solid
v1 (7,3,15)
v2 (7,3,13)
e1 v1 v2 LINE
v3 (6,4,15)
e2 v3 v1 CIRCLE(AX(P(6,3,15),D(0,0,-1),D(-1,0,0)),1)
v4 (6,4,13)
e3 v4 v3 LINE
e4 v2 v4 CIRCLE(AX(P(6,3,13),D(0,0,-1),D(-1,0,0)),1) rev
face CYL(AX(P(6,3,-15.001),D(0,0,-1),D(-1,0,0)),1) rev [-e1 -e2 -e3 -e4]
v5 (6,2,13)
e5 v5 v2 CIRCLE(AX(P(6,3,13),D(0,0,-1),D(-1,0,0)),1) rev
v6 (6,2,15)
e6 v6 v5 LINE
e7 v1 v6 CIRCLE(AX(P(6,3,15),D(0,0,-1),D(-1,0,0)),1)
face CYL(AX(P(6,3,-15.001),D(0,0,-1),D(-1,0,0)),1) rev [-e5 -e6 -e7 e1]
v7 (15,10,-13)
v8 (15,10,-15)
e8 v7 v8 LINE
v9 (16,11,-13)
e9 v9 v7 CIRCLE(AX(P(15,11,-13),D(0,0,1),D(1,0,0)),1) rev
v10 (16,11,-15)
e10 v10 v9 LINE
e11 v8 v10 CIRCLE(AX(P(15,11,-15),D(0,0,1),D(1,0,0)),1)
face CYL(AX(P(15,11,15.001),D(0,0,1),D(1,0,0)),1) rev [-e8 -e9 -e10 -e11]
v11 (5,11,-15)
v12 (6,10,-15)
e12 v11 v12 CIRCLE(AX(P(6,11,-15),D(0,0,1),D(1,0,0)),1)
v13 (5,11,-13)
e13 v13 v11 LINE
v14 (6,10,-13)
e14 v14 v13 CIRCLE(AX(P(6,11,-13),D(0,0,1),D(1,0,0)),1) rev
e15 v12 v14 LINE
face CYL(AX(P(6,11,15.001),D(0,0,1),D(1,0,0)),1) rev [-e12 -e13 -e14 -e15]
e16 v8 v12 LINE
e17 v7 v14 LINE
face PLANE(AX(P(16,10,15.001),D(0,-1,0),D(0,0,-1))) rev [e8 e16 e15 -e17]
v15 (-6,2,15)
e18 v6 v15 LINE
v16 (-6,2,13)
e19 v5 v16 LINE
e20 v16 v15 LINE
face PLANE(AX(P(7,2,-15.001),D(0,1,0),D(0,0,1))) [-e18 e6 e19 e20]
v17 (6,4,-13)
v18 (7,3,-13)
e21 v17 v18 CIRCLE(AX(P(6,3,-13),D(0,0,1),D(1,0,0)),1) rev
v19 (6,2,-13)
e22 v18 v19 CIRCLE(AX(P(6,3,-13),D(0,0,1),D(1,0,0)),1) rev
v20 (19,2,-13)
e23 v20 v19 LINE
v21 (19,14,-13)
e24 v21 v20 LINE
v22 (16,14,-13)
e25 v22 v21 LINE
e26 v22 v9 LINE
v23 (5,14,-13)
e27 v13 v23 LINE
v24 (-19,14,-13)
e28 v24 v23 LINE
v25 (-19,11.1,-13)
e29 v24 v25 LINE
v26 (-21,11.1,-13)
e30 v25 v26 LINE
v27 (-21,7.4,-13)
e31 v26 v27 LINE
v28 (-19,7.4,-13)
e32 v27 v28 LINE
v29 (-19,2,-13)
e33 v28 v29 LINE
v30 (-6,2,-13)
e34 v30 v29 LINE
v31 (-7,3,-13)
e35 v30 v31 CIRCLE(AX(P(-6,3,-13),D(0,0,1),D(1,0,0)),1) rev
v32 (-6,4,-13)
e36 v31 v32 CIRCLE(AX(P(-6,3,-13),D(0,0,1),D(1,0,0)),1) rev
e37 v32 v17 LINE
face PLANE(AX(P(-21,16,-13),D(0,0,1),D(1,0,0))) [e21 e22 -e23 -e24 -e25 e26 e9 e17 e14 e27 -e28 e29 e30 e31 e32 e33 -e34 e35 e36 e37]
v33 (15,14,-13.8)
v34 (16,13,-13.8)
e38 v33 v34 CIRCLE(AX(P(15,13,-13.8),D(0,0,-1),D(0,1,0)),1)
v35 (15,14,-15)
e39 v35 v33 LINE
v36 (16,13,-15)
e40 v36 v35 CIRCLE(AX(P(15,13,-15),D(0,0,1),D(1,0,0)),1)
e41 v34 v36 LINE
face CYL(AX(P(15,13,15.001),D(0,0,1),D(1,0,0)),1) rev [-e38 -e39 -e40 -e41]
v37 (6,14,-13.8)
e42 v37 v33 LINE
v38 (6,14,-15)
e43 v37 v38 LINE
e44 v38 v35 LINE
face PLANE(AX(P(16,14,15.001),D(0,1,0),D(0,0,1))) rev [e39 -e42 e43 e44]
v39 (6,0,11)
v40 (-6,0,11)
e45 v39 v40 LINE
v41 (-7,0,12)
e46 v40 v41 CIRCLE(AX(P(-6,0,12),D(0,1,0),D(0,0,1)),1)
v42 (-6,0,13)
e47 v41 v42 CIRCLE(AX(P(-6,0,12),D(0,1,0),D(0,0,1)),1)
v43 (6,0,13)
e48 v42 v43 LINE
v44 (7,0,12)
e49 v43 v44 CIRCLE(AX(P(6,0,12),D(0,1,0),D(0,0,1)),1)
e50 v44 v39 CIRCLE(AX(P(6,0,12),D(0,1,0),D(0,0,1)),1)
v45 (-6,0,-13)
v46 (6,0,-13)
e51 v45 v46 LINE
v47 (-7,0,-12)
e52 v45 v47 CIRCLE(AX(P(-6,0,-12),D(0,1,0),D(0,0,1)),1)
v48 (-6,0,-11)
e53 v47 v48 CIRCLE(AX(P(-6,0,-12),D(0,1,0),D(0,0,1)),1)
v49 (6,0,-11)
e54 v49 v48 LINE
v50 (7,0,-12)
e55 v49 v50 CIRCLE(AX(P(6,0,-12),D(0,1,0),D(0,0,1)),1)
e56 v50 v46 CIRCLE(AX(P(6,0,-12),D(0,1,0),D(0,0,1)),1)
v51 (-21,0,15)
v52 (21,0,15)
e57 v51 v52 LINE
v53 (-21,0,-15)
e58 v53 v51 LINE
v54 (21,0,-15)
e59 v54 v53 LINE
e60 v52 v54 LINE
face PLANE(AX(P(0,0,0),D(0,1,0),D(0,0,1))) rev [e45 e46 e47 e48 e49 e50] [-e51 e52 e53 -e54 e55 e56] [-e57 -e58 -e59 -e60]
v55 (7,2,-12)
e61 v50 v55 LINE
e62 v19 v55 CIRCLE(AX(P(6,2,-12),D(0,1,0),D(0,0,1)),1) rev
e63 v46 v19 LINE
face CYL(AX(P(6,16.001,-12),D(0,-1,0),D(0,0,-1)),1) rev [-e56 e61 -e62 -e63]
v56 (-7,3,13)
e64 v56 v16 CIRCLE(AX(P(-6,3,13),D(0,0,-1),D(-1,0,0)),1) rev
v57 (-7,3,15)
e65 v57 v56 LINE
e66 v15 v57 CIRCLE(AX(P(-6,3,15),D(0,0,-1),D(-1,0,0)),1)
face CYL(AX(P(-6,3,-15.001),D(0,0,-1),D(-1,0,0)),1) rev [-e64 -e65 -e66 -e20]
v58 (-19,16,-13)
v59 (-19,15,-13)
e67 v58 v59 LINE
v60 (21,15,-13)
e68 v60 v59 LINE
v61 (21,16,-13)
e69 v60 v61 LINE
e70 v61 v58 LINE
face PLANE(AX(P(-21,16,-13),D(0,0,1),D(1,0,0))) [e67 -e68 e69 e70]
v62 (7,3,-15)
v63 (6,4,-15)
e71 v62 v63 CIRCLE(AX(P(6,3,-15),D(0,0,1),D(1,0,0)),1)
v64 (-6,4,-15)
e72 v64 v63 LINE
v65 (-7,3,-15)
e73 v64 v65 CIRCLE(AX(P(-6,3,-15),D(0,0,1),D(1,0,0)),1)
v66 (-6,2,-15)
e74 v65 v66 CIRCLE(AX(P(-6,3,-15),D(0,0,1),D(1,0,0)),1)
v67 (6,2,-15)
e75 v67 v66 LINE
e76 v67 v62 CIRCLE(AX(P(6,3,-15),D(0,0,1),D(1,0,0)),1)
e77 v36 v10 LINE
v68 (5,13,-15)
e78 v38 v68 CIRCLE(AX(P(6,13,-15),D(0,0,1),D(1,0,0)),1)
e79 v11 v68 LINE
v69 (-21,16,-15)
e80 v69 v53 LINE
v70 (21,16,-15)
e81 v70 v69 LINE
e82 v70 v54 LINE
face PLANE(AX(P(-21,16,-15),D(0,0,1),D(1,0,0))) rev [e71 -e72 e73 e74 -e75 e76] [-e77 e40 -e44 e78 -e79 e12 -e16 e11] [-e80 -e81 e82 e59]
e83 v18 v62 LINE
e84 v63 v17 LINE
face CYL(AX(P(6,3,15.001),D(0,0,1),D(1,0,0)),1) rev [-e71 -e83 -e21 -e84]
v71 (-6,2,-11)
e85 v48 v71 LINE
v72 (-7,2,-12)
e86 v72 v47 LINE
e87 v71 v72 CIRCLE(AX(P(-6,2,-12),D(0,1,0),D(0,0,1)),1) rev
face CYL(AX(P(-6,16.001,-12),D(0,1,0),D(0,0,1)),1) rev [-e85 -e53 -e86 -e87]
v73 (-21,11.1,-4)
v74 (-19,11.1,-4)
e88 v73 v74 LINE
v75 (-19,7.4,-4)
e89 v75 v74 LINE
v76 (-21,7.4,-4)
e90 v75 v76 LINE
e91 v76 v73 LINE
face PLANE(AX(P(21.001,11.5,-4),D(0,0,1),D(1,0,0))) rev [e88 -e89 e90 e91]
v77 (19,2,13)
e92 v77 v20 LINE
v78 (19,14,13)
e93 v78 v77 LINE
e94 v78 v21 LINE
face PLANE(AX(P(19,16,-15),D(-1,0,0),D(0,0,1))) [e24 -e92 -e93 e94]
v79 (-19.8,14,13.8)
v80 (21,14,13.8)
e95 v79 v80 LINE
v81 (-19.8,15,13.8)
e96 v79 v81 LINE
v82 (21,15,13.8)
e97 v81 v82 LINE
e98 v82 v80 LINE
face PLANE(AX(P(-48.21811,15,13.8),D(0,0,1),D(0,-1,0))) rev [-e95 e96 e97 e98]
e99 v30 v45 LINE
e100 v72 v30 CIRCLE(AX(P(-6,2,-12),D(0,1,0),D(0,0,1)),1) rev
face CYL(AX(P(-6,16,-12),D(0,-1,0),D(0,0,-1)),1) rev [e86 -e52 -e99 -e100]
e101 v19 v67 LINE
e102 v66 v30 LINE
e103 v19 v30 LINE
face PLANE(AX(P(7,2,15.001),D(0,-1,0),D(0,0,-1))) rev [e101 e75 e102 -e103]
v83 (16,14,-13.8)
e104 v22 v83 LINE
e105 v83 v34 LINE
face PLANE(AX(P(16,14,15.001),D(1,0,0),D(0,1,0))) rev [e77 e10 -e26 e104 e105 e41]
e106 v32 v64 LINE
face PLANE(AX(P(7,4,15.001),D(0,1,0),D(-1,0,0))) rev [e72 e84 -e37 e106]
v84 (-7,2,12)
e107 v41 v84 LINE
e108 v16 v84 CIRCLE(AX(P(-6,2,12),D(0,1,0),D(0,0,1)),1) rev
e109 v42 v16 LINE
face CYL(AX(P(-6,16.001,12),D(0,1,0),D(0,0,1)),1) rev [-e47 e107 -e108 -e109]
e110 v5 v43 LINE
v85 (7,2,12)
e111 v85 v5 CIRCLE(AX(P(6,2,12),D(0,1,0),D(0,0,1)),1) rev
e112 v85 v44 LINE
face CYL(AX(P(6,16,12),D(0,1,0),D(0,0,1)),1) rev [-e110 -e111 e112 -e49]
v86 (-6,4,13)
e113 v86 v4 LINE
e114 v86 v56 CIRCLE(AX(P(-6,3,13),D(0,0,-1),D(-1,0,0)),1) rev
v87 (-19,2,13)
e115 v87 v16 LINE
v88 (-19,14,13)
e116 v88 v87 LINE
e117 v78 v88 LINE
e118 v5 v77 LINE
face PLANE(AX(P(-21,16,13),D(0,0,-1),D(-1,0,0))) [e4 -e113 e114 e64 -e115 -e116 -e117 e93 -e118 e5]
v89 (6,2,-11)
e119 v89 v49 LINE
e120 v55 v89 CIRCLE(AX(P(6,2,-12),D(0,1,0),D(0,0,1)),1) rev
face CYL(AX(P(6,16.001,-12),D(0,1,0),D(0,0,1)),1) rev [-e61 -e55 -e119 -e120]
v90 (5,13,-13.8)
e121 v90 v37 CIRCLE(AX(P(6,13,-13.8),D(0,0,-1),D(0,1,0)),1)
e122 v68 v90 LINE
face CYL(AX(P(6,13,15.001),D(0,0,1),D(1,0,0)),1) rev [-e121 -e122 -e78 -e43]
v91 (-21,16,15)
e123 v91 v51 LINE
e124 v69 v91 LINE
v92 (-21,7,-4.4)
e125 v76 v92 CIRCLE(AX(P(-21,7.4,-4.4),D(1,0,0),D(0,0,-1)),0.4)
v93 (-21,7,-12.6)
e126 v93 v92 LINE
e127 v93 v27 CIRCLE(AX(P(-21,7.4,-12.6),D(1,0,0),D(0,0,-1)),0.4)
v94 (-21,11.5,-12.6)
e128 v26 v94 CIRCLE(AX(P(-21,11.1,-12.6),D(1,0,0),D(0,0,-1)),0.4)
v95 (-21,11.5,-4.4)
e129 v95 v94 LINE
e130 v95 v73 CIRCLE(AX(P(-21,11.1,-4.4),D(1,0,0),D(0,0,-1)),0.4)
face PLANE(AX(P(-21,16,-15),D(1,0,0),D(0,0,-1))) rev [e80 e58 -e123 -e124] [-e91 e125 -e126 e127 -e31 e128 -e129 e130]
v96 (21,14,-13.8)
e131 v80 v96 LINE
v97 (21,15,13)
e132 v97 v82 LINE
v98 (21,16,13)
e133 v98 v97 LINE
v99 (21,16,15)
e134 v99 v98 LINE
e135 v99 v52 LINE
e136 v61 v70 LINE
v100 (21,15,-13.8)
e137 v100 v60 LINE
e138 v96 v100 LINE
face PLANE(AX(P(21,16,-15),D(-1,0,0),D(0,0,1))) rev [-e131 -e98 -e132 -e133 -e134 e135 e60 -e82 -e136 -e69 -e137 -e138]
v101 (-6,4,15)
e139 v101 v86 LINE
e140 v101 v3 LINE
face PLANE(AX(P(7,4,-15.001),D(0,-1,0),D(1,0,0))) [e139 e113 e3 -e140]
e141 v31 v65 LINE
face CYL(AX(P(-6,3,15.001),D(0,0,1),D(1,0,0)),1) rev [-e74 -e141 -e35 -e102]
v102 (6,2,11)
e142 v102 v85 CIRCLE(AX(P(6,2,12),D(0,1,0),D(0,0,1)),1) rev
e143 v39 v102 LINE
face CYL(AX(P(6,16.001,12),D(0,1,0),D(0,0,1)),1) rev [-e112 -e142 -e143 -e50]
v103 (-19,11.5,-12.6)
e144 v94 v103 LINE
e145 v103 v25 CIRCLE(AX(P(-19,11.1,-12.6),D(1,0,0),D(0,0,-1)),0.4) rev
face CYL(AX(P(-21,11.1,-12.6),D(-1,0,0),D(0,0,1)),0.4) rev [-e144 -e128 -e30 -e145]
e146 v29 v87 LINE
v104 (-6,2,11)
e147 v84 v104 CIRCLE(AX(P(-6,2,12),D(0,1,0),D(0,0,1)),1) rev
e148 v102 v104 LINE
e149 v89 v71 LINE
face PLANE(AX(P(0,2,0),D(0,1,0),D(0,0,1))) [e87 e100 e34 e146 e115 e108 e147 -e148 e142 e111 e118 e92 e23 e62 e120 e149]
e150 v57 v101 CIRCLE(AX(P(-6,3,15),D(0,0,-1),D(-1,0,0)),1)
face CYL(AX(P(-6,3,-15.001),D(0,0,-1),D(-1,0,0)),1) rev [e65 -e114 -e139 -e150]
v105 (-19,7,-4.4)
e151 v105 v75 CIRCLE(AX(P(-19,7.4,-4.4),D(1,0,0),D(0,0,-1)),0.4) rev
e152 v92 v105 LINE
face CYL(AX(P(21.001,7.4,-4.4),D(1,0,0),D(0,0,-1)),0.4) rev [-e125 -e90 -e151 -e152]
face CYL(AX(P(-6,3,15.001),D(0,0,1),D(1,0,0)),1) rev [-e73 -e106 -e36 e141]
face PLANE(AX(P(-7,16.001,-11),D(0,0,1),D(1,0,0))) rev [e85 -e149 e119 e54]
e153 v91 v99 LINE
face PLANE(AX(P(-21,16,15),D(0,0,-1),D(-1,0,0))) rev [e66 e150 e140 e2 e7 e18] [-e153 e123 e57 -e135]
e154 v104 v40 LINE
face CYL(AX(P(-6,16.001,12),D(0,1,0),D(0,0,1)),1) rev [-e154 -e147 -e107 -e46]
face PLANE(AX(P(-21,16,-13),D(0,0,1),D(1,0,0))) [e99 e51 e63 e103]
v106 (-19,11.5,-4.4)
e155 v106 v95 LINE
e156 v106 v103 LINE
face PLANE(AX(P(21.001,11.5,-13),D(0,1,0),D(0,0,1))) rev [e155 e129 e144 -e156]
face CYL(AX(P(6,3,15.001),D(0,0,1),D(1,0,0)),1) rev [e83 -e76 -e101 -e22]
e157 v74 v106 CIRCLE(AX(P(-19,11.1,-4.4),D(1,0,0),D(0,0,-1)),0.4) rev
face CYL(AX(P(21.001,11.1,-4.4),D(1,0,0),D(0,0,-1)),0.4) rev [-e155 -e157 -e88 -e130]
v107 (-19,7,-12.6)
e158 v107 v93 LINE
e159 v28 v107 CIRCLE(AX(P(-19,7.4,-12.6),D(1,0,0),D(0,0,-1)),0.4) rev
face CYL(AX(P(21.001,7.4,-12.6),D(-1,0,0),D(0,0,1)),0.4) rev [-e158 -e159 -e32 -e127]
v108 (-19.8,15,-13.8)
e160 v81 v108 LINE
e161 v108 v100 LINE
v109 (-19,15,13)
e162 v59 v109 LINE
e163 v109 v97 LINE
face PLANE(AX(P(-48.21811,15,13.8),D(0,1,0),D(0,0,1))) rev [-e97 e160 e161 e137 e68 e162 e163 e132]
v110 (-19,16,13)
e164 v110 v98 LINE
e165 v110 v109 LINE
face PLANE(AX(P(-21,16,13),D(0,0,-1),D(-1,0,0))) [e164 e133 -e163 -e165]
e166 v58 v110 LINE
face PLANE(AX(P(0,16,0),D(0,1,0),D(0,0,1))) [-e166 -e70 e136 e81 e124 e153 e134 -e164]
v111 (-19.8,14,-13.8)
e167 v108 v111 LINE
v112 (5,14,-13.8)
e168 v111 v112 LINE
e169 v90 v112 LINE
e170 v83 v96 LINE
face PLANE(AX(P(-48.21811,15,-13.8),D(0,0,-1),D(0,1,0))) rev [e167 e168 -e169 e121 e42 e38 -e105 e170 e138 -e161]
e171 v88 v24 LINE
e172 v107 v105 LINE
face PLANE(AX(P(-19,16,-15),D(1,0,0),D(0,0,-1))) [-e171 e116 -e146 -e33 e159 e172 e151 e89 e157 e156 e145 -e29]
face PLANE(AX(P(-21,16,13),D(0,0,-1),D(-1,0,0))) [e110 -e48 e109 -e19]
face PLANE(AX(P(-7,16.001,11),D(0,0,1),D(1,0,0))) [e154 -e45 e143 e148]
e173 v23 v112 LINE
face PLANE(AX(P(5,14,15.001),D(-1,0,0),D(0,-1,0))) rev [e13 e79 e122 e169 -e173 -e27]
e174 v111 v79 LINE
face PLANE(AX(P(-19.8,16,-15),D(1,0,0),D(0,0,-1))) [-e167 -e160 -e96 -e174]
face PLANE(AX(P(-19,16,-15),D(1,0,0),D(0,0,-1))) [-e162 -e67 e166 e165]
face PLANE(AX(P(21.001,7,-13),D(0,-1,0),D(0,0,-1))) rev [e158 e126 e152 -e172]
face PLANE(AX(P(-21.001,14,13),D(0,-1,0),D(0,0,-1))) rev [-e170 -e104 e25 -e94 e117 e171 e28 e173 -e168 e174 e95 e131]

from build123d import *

# Parameters (mm, degrees)
SKETCH_1_W             = 42
SKETCH_1_H             = 30
EXTRUDE_1_DEPTH        = 16
SHELL_1_T              = -2
CUT_EXTRUDE_3_REACH    = 49.381
SKETCH_4_W             = 26
SKETCH_4_H             = 2
SKETCH_5_W             = 27.6
SKETCH_5_H             = 1
CUT_EXTRUDE_4_DEPTH    = 40.8
CUT_EXTRUDE_6_REACH    = 32.364
SKETCH_8_W             = 14
SKETCH_8_H             = 2
CUT_EXTRUDE_7_REACH    = 41.962
SKETCH_9_W             = 14
SKETCH_9_H             = 2
FILLET_3_R             = 1
FILLET_4_R             = 1
FILLET_3_OF_MIRROR_1_R = 1
FILLET_4_OF_MIRROR_1_R = 1
CUT_EXTRUDE_8_REACH    = 49.381
SKETCH_10_W            = 9
SKETCH_10_H            = 4.5
CUT_EXTRUDE_9_REACH    = 41.962
SKETCH_11_W            = 11
SKETCH_11_H            = 4
FILLET_5_R             = 1
FILLET_6_R             = 0.4


# Some blends are built 0.0001 mm under size
with BuildPart() as part:
    # 草图1 → 凸台-拉伸1 (new body)
    with BuildSketch(Plane(origin=(0, 0, 0), x_dir=(1, 0, 0), z_dir=(0, 1, 0))):
        Rectangle(SKETCH_1_W, SKETCH_1_H)
    extrude(amount=EXTRUDE_1_DEPTH)

    # 抽壳1
    shell_1_openings = [part.faces().sort_by_distance(p)[0] for p in [
        (0, 16, 0),
    ]]
    offset(amount=SHELL_1_T, openings=shell_1_openings, kind=Kind.INTERSECTION)

    # 草图4 → 切除-拉伸3 (cut, up to next)
    with BuildSketch(Plane(origin=(21, 0, 0), x_dir=(0, 0, -1), z_dir=(1, 0, 0)), mode=Mode.PRIVATE) as cut_extrude_3_sk1:
        with Locations((0, 15)):
            Rectangle(SKETCH_4_W, SKETCH_4_H)
    cut_extrude_3_tool1 = extrude(cut_extrude_3_sk1.sketch, amount=-CUT_EXTRUDE_3_REACH, mode=Mode.PRIVATE) & part.part
    add(cut_extrude_3_tool1.solids().sort_by_distance((21, 15, 0))[0], mode=Mode.SUBTRACT)

    # 草图5 → 切除-拉伸4 (cut)
    with BuildSketch(Plane(origin=(21, 0, 0), x_dir=(0, 0, -1), z_dir=(1, 0, 0))):
        with Locations((0, 14.5)):
            Rectangle(SKETCH_5_W, SKETCH_5_H)
    extrude(amount=-CUT_EXTRUDE_4_DEPTH, mode=Mode.SUBTRACT)

    # 草图8 → 切除-拉伸6 (cut, up to next)
    with BuildSketch(Plane.XZ, mode=Mode.PRIVATE) as cut_extrude_6_sk1:
        with Locations((0, -12)):
            Rectangle(SKETCH_8_W, SKETCH_8_H)
    cut_extrude_6_tool1 = extrude(cut_extrude_6_sk1.sketch, amount=-CUT_EXTRUDE_6_REACH, mode=Mode.PRIVATE) & part.part
    cut_extrude_6 = cut_extrude_6_tool1.solids().sort_by_distance((0, 0, -12))[0]
    add(cut_extrude_6, mode=Mode.SUBTRACT)

    # 草图9 → 切除-拉伸7 (cut, up to next)
    with BuildSketch(Plane(origin=(0, 0, -15), x_dir=(-1, 0, 0), z_dir=(0, 0, -1)), mode=Mode.PRIVATE) as cut_extrude_7_sk1:
        with Locations((0, 3)):
            Rectangle(SKETCH_9_W, SKETCH_9_H)
    cut_extrude_7_tool1 = extrude(cut_extrude_7_sk1.sketch, amount=-CUT_EXTRUDE_7_REACH, mode=Mode.PRIVATE) & part.part
    cut_extrude_7 = cut_extrude_7_tool1.solids().sort_by_distance((0, 3, -15))[0]
    add(cut_extrude_7, mode=Mode.SUBTRACT)

    # 圆角3
    # the kernel refuses this fillet: 1 mm, written as the material it adds along each edge
    with BuildSketch(Plane(origin=(-7, 4, -15), x_dir=(0, -1, 0), z_dir=(0, 0, 1)), Plane(origin=(-7, 2, -15), x_dir=(1, 0, 0), z_dir=(0, 0, 1)), Plane(origin=(7, 2, -15), x_dir=(0, 1, 0), z_dir=(0, 0, 1))) as fillet_3_piece_1:
        with BuildLine():
            CenterArc((FILLET_3_R, FILLET_3_R), FILLET_3_R, 180, 90)
            Line((0, FILLET_3_R), (0, 0))
            Line((0, 0), (FILLET_3_R, 0))
        make_face()
    extrude(amount=2)
    with BuildSketch(Plane(origin=(7, 4, -15), x_dir=(0, -1, 0), z_dir=(0, 0, 1))) as fillet_3_piece_2:
        with BuildLine():
            CenterArc((FILLET_3_R, -FILLET_3_R), FILLET_3_R, 90, 90)
            Line((0, -FILLET_3_R), (0, 0))
            Line((0, 0), (FILLET_3_R, 0))
        make_face()
    extrude(amount=2)

    # 圆角4
    fillet_4_edges = [part.edges().sort_by_distance(p)[0] for p in [
        (-7, 1, -13),
        (-7, 1, -11),
        (7, 1, -13),
        (7, 1, -11),
    ]]
    fillet(fillet_4_edges, radius=FILLET_4_R - 0.0001)  # a hair under: the kernel refuses the full size

    # 镜向1: 切除-拉伸6, 切除-拉伸7 across plane
    add(cut_extrude_6.mirror(Plane.XY), mode=Mode.SUBTRACT)
    add(cut_extrude_7.mirror(Plane.XY), mode=Mode.SUBTRACT)

    # 圆角3 of 镜向1
    # the kernel refuses this fillet: 1 mm, written as the material it adds along each edge
    with BuildSketch(Plane(origin=(-7, 4, 15), x_dir=(1, 0, 0), z_dir=(0, 0, -1)), Plane(origin=(-7, 2, 15), x_dir=(0, 1, 0), z_dir=(0, 0, -1)), Plane(origin=(7, 2, 15), x_dir=(-1, 0, 0), z_dir=(0, 0, -1))) as fillet_3_of_mirror_1_piece_1:
        with BuildLine():
            CenterArc((FILLET_3_OF_MIRROR_1_R, FILLET_3_OF_MIRROR_1_R), FILLET_3_OF_MIRROR_1_R, 180, 90)
            Line((0, FILLET_3_OF_MIRROR_1_R), (0, 0))
            Line((0, 0), (FILLET_3_OF_MIRROR_1_R, 0))
        make_face()
    extrude(amount=2)
    with BuildSketch(Plane(origin=(7, 4, 15), x_dir=(-1, 0, 0), z_dir=(0, 0, -1))) as fillet_3_of_mirror_1_piece_2:
        with BuildLine():
            CenterArc((FILLET_3_OF_MIRROR_1_R, -FILLET_3_OF_MIRROR_1_R), FILLET_3_OF_MIRROR_1_R, 90, 90)
            Line((0, -FILLET_3_OF_MIRROR_1_R), (0, 0))
            Line((0, 0), (FILLET_3_OF_MIRROR_1_R, 0))
        make_face()
    extrude(amount=2)

    # 圆角4 of 镜向1
    fillet_4_of_mirror_1_edges = [part.edges().sort_by_distance(p)[0] for p in [
        (-7, 1, 13),
        (-7, 1, 11),
        (7, 1, 13),
        (7, 1, 11),
    ]]
    fillet(fillet_4_of_mirror_1_edges, radius=FILLET_4_OF_MIRROR_1_R - 0.0001)  # a hair under: the kernel refuses the full size

    # 草图10 → 切除-拉伸8 (cut, up to next)
    with BuildSketch(Plane.ZY.offset(21), mode=Mode.PRIVATE) as cut_extrude_8_sk1:
        with Locations((-8.5, 9.25)):
            Rectangle(SKETCH_10_W, SKETCH_10_H)
    cut_extrude_8_tool1 = extrude(cut_extrude_8_sk1.sketch, amount=-CUT_EXTRUDE_8_REACH, mode=Mode.PRIVATE) & part.part
    add(cut_extrude_8_tool1.solids().sort_by_distance((-21, 9.25, -8.5))[0], mode=Mode.SUBTRACT)

    # 草图11 → 切除-拉伸9 (cut, up to next)
    with BuildSketch(Plane(origin=(0, 0, -15), x_dir=(-1, 0, 0), z_dir=(0, 0, -1)), mode=Mode.PRIVATE) as cut_extrude_9_sk1:
        with Locations((-10.5, 12)):
            Rectangle(SKETCH_11_W, SKETCH_11_H)
    cut_extrude_9_tool1 = extrude(cut_extrude_9_sk1.sketch, amount=-CUT_EXTRUDE_9_REACH, mode=Mode.PRIVATE) & part.part
    add(cut_extrude_9_tool1.solids().sort_by_distance((10.5, 12, -15))[0], mode=Mode.SUBTRACT)

    # 圆角5
    fillet_5_edges = [part.edges().sort_by_distance(p)[0] for p in [
        (16, 14, -14.4),
        (16, 10, -14),
        (5, 14, -14.4),
        (5, 10, -14),
    ]]
    fillet(fillet_5_edges, radius=FILLET_5_R)

    # 圆角6
    fillet_6_edges = [part.edges().sort_by_distance(p)[0] for p in [
        (-20, 7, -4),
        (-20, 11.5, -4),
        (-20, 11.5, -13),
        (-20, 7, -13),
    ]]
    fillet(fillet_6_edges, radius=FILLET_6_R)


solid = part.part
